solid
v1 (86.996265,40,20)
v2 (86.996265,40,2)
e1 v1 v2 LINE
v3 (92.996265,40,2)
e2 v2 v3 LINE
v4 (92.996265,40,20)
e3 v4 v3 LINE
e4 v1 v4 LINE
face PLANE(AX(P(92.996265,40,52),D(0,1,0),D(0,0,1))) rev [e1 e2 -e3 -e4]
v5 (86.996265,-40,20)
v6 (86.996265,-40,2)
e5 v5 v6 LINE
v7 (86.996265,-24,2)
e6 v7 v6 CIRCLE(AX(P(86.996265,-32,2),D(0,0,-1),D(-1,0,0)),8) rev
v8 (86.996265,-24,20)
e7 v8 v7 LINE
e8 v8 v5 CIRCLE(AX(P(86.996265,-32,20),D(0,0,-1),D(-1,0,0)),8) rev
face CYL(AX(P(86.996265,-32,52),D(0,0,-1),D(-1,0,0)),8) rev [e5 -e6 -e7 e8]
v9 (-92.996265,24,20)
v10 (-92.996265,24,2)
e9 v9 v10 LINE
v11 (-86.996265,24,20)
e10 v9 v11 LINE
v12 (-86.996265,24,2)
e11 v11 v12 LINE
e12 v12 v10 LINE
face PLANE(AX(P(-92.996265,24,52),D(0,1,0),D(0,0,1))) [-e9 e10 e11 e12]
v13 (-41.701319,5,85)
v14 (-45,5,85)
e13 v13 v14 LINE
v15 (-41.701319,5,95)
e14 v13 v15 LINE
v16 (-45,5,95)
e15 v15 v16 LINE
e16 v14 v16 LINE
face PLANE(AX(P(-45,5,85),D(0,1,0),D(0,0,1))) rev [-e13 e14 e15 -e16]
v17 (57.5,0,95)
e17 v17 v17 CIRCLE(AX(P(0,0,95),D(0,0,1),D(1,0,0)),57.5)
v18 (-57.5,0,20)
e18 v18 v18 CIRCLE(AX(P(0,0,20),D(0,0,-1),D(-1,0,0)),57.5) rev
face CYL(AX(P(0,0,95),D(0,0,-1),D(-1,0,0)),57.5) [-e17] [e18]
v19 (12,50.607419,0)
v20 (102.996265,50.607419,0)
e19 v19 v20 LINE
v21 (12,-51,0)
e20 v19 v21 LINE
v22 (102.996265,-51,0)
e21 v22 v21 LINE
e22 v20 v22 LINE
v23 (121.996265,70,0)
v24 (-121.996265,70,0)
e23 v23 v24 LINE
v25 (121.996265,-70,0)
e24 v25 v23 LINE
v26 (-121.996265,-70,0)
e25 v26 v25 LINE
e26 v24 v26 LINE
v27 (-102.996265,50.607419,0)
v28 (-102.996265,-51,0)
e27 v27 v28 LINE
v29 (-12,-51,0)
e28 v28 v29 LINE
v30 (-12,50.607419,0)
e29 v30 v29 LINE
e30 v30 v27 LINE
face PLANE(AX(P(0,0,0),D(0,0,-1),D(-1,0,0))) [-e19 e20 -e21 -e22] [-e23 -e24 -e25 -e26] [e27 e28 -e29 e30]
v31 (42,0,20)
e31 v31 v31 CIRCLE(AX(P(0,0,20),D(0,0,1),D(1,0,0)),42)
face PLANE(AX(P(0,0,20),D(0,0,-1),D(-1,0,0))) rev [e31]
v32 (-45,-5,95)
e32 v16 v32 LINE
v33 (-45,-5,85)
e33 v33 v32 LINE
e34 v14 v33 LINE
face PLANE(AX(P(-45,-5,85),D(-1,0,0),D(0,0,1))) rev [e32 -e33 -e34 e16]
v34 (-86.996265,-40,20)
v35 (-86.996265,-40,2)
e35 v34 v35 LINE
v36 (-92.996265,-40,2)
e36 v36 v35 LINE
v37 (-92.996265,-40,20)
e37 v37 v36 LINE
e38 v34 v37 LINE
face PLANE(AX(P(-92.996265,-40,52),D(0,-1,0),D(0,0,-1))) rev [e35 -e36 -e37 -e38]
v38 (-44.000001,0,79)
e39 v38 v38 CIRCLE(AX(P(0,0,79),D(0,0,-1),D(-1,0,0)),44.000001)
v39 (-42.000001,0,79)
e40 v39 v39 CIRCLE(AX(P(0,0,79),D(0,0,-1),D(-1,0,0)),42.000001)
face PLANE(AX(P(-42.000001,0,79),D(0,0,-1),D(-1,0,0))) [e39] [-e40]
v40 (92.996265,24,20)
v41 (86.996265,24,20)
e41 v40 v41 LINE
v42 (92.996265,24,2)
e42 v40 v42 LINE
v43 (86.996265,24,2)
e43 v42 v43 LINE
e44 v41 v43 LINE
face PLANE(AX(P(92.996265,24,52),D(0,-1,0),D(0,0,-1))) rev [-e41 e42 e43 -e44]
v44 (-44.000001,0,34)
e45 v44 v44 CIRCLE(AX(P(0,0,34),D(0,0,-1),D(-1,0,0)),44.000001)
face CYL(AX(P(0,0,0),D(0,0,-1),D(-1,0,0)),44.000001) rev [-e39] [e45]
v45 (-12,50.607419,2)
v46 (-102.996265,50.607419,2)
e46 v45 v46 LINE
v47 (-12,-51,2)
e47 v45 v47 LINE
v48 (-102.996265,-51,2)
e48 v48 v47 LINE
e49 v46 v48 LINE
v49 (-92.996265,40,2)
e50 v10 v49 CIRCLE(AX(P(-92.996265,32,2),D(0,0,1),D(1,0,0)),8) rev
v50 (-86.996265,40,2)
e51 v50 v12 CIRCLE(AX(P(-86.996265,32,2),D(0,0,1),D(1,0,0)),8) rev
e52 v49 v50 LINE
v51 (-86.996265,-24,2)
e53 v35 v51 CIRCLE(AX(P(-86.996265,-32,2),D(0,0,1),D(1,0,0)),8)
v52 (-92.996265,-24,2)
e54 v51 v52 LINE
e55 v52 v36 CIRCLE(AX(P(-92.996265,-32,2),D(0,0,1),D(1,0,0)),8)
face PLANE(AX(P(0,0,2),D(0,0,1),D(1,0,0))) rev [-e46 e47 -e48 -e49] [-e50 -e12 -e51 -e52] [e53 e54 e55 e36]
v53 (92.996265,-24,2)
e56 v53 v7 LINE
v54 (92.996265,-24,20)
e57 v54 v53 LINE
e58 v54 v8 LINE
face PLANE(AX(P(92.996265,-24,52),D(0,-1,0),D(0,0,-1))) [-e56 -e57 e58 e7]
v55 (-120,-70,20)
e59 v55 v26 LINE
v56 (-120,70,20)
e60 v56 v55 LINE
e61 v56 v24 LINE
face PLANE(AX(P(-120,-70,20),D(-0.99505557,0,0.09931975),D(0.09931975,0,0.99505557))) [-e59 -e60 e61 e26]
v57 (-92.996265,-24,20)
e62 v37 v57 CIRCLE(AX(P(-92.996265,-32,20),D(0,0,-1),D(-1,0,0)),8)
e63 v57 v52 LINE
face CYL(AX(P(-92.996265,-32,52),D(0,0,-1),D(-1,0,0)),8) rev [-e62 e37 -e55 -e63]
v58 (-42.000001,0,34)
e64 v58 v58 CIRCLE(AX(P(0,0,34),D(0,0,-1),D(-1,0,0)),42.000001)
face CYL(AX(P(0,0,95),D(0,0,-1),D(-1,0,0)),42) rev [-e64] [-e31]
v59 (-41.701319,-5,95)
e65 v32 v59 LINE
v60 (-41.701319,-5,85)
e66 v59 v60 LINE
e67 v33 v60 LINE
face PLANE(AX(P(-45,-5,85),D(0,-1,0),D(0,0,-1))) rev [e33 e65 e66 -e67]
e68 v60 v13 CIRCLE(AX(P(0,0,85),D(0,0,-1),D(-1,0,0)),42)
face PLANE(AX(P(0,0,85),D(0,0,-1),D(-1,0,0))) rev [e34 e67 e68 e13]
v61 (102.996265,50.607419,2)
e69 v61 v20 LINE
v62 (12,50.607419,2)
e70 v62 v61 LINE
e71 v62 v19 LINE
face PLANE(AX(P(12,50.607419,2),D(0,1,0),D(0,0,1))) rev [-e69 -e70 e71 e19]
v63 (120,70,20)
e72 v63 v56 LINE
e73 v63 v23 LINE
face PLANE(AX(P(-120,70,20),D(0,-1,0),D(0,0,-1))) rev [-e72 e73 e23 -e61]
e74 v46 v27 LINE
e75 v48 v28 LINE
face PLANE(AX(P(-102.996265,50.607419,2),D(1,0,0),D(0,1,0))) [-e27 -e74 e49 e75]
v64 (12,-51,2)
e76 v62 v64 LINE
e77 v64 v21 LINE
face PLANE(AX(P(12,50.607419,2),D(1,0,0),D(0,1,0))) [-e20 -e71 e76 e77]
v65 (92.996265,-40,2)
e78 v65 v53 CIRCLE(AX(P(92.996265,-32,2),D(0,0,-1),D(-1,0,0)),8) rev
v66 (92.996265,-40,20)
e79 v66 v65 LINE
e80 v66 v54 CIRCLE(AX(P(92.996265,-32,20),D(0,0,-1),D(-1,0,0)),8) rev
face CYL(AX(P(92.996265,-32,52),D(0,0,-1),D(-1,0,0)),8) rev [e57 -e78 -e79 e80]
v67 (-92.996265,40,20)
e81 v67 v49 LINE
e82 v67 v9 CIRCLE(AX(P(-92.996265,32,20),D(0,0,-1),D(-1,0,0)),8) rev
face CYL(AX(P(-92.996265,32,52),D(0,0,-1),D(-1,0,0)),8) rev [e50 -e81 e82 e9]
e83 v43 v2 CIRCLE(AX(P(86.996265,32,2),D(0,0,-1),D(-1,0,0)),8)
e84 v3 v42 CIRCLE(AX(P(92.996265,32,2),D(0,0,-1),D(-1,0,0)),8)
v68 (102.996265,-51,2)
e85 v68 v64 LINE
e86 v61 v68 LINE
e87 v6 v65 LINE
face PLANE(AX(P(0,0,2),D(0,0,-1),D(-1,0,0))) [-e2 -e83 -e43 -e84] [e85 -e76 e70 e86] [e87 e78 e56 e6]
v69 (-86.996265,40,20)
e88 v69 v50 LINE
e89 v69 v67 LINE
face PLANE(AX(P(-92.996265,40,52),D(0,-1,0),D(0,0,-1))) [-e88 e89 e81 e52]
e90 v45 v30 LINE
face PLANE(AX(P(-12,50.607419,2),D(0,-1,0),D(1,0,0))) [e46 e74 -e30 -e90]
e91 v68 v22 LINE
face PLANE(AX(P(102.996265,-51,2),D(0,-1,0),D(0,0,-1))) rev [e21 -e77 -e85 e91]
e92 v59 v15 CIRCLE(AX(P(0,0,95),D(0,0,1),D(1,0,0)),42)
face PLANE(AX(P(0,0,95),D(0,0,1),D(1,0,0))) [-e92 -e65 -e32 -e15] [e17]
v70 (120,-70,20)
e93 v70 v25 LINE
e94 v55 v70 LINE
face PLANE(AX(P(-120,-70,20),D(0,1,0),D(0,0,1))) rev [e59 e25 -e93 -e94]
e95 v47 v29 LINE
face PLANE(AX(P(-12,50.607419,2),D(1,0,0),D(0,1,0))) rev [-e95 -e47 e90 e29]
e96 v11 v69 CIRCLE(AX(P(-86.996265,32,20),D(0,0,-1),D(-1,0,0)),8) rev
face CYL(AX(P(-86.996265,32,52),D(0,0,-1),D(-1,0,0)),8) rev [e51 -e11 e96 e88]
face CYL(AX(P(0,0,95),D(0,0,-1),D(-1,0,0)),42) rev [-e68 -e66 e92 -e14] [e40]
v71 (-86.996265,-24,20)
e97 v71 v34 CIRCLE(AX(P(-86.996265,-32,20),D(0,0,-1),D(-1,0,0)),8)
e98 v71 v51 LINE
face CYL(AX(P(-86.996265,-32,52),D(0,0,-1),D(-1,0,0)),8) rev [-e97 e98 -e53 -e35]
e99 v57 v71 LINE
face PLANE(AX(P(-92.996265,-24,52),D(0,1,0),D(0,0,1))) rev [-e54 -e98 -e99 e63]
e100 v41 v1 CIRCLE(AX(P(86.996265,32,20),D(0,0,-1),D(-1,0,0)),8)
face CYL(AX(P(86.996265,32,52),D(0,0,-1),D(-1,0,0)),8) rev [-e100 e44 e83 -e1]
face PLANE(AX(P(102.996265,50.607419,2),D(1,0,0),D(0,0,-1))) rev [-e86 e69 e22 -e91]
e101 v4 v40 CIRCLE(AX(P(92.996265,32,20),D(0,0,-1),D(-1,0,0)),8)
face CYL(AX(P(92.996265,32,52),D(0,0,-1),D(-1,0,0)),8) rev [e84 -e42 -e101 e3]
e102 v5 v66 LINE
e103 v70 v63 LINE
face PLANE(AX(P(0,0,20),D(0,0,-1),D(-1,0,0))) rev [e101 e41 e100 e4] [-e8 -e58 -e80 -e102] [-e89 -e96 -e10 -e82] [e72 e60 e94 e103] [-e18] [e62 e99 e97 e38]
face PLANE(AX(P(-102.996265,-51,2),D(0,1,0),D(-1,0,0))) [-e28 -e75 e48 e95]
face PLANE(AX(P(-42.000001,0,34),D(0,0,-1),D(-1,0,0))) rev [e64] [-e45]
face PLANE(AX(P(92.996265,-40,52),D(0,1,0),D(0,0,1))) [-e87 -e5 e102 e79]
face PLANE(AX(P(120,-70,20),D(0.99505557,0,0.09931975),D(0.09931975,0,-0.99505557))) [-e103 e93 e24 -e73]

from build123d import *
from OCP.BRepAlgoAPI import BRepAlgoAPI_Cut
from OCP.TopTools import TopTools_ListOfShape

# Parameters (mm, degrees)
SKETCH1_W            = 240
SKETCH1_H            = 140
BOSS_EXTRUDE2_DEPTH  = 20
DRAFT1_ANGLE         = 5.7
SKETCH4_W            = 90.996265389
SKETCH4_H            = 101.607418567
CUT_EXTRUDE1_DEPTH   = 2
CUT_EXTRUDE3_DEPTH   = 52
MIRROR2_COPY_1_DEPTH = 52
MIRROR2_COPY_2_DEPTH = 52
SKETCH6_R            = 57.5
SKETCH6_R_2          = 42
BOSS_EXTRUDE3_DEPTH  = 75
SKETCH7_W            = 6
SKETCH7_H            = 10
CUT_EXTRUDE4_DEPTH   = 10
SKETCH8_W            = 2
SKETCH8_H            = 45


with BuildPart() as part:
    # Sketch1 → Boss-Extrude2 (new body)
    with BuildSketch(Plane.XY):
        Rectangle(SKETCH1_W, SKETCH1_H)
    extrude(amount=BOSS_EXTRUDE2_DEPTH)

    # Draft1
    draft1_faces = [part.faces().sort_by_distance(p)[0] for p in [
        (120, 0, 10),
        (-120, 0, 10),
    ]]
    draft(draft1_faces, Plane.XY.offset(20), DRAFT1_ANGLE)

    # Sketch4 → Cut-Extrude1 (cut)
    with BuildSketch(Plane(origin=(0, 0, 0), x_dir=(-1, 0, 0), z_dir=(0, 0, -1))):
        with Locations((-57.498132695, -0.196290716)):
            Rectangle(SKETCH4_W, SKETCH4_H)
        with Locations((57.498132695, -0.196290716)):
            Rectangle(SKETCH4_W, SKETCH4_H)
    extrude(amount=-CUT_EXTRUDE1_DEPTH, mode=Mode.SUBTRACT)

    # Sketch5 → Cut-Extrude3 (cut)
    with BuildSketch(Plane(origin=(0, 0, 0), x_dir=(-1, 0, 0), z_dir=(0, 0, -1))):
        with BuildLine():
            Line((-92.996265389, 24), (-86.996265389, 24))
            ThreePointArc((-86.996265389, 24), (-78.996265389, 32), (-86.996265389, 40))
            Line((-86.996265389, 40), (-92.996265389, 40))
            ThreePointArc((-92.996265389, 40), (-100.996265389, 32), (-92.996265389, 24))
        make_face()
    cut_extrude3 = extrude(amount=-CUT_EXTRUDE3_DEPTH, mode=Mode.SUBTRACT)

    # Mirror1: Cut-Extrude3 across plane
    add(cut_extrude3.mirror(Plane(origin=(0, 0, 0), x_dir=(0, 0, 1), z_dir=(1, 0, 0))), mode=Mode.SUBTRACT)

    # Mirror2 copy 1 sketch → Mirror2 copy 1 (cut)
    with BuildSketch(Plane(origin=(0, 0, 0), x_dir=(1, 0, 0), z_dir=(0, 0, -1))):
        with BuildLine():
            Line((-92.996265389, 24), (-86.996265389, 24))
            ThreePointArc((-86.996265389, 24), (-78.996265389, 32), (-86.996265389, 40))
            Line((-86.996265389, 40), (-92.996265389, 40))
            ThreePointArc((-92.996265389, 40), (-100.996265389, 32), (-92.996265389, 24))
        make_face()
    extrude(amount=-MIRROR2_COPY_1_DEPTH, mode=Mode.SUBTRACT)

    # Mirror2 copy 2 sketch → Mirror2 copy 2 (cut)
    with BuildSketch(Plane(origin=(0, 0, 0), x_dir=(-1, 0, 0), z_dir=(0, 0, -1))):
        with BuildLine():
            Line((-92.996265389, -24), (-86.996265389, -24))
            ThreePointArc((-86.996265389, -24), (-78.996265389, -32), (-86.996265389, -40))
            Line((-86.996265389, -40), (-92.996265389, -40))
            ThreePointArc((-92.996265389, -40), (-100.996265389, -32), (-92.996265389, -24))
        make_face()
    extrude(amount=-MIRROR2_COPY_2_DEPTH, mode=Mode.SUBTRACT)

    # Sketch6 → Boss-Extrude3 (add)
    with BuildSketch(Plane.XY.offset(20)):
        Circle(SKETCH6_R)
        Circle(SKETCH6_R_2, mode=Mode.SUBTRACT)
    extrude(amount=BOSS_EXTRUDE3_DEPTH)

    # Sketch7 → Cut-Extrude4 (cut)
    with BuildSketch(Plane.XY.offset(95)):
        with Locations((-42, 0)):
            Rectangle(SKETCH7_W, SKETCH7_H)
    extrude(amount=-CUT_EXTRUDE4_DEPTH, mode=Mode.SUBTRACT)


with BuildPart() as cut_revolve1_tool:
    # Sketch8 → Cut-Revolve1 (revolve)
    with BuildSketch(Plane(origin=(0, 0, 0), x_dir=(1, 0, 0), z_dir=(0, 1, 0))):
        with Locations((-43.000000734, -56.5)):
            Rectangle(SKETCH8_W, SKETCH8_H)
    revolve(axis=Axis((0, 0, 0), (0, 0, 1)))


with BuildPart() as part_1:
    add(part.part)

    # Cut-Revolve1: cut by cut_revolve1_tool, with a tolerance
    cut_revolve1_stock = TopTools_ListOfShape()
    cut_revolve1_stock.Append(part_1.part.wrapped)
    cut_revolve1_tools = TopTools_ListOfShape()
    cut_revolve1_tools.Append(cut_revolve1_tool.part.wrapped)
    cut_revolve1_cut = BRepAlgoAPI_Cut()
    cut_revolve1_cut.SetArguments(cut_revolve1_stock)
    cut_revolve1_cut.SetTools(cut_revolve1_tools)
    cut_revolve1_cut.SetFuzzyValue(0.00001)
    cut_revolve1_cut.Build()
    add(Compound.cast(cut_revolve1_cut.Shape()).solids(), mode=Mode.REPLACE)


solid = part_1.part
